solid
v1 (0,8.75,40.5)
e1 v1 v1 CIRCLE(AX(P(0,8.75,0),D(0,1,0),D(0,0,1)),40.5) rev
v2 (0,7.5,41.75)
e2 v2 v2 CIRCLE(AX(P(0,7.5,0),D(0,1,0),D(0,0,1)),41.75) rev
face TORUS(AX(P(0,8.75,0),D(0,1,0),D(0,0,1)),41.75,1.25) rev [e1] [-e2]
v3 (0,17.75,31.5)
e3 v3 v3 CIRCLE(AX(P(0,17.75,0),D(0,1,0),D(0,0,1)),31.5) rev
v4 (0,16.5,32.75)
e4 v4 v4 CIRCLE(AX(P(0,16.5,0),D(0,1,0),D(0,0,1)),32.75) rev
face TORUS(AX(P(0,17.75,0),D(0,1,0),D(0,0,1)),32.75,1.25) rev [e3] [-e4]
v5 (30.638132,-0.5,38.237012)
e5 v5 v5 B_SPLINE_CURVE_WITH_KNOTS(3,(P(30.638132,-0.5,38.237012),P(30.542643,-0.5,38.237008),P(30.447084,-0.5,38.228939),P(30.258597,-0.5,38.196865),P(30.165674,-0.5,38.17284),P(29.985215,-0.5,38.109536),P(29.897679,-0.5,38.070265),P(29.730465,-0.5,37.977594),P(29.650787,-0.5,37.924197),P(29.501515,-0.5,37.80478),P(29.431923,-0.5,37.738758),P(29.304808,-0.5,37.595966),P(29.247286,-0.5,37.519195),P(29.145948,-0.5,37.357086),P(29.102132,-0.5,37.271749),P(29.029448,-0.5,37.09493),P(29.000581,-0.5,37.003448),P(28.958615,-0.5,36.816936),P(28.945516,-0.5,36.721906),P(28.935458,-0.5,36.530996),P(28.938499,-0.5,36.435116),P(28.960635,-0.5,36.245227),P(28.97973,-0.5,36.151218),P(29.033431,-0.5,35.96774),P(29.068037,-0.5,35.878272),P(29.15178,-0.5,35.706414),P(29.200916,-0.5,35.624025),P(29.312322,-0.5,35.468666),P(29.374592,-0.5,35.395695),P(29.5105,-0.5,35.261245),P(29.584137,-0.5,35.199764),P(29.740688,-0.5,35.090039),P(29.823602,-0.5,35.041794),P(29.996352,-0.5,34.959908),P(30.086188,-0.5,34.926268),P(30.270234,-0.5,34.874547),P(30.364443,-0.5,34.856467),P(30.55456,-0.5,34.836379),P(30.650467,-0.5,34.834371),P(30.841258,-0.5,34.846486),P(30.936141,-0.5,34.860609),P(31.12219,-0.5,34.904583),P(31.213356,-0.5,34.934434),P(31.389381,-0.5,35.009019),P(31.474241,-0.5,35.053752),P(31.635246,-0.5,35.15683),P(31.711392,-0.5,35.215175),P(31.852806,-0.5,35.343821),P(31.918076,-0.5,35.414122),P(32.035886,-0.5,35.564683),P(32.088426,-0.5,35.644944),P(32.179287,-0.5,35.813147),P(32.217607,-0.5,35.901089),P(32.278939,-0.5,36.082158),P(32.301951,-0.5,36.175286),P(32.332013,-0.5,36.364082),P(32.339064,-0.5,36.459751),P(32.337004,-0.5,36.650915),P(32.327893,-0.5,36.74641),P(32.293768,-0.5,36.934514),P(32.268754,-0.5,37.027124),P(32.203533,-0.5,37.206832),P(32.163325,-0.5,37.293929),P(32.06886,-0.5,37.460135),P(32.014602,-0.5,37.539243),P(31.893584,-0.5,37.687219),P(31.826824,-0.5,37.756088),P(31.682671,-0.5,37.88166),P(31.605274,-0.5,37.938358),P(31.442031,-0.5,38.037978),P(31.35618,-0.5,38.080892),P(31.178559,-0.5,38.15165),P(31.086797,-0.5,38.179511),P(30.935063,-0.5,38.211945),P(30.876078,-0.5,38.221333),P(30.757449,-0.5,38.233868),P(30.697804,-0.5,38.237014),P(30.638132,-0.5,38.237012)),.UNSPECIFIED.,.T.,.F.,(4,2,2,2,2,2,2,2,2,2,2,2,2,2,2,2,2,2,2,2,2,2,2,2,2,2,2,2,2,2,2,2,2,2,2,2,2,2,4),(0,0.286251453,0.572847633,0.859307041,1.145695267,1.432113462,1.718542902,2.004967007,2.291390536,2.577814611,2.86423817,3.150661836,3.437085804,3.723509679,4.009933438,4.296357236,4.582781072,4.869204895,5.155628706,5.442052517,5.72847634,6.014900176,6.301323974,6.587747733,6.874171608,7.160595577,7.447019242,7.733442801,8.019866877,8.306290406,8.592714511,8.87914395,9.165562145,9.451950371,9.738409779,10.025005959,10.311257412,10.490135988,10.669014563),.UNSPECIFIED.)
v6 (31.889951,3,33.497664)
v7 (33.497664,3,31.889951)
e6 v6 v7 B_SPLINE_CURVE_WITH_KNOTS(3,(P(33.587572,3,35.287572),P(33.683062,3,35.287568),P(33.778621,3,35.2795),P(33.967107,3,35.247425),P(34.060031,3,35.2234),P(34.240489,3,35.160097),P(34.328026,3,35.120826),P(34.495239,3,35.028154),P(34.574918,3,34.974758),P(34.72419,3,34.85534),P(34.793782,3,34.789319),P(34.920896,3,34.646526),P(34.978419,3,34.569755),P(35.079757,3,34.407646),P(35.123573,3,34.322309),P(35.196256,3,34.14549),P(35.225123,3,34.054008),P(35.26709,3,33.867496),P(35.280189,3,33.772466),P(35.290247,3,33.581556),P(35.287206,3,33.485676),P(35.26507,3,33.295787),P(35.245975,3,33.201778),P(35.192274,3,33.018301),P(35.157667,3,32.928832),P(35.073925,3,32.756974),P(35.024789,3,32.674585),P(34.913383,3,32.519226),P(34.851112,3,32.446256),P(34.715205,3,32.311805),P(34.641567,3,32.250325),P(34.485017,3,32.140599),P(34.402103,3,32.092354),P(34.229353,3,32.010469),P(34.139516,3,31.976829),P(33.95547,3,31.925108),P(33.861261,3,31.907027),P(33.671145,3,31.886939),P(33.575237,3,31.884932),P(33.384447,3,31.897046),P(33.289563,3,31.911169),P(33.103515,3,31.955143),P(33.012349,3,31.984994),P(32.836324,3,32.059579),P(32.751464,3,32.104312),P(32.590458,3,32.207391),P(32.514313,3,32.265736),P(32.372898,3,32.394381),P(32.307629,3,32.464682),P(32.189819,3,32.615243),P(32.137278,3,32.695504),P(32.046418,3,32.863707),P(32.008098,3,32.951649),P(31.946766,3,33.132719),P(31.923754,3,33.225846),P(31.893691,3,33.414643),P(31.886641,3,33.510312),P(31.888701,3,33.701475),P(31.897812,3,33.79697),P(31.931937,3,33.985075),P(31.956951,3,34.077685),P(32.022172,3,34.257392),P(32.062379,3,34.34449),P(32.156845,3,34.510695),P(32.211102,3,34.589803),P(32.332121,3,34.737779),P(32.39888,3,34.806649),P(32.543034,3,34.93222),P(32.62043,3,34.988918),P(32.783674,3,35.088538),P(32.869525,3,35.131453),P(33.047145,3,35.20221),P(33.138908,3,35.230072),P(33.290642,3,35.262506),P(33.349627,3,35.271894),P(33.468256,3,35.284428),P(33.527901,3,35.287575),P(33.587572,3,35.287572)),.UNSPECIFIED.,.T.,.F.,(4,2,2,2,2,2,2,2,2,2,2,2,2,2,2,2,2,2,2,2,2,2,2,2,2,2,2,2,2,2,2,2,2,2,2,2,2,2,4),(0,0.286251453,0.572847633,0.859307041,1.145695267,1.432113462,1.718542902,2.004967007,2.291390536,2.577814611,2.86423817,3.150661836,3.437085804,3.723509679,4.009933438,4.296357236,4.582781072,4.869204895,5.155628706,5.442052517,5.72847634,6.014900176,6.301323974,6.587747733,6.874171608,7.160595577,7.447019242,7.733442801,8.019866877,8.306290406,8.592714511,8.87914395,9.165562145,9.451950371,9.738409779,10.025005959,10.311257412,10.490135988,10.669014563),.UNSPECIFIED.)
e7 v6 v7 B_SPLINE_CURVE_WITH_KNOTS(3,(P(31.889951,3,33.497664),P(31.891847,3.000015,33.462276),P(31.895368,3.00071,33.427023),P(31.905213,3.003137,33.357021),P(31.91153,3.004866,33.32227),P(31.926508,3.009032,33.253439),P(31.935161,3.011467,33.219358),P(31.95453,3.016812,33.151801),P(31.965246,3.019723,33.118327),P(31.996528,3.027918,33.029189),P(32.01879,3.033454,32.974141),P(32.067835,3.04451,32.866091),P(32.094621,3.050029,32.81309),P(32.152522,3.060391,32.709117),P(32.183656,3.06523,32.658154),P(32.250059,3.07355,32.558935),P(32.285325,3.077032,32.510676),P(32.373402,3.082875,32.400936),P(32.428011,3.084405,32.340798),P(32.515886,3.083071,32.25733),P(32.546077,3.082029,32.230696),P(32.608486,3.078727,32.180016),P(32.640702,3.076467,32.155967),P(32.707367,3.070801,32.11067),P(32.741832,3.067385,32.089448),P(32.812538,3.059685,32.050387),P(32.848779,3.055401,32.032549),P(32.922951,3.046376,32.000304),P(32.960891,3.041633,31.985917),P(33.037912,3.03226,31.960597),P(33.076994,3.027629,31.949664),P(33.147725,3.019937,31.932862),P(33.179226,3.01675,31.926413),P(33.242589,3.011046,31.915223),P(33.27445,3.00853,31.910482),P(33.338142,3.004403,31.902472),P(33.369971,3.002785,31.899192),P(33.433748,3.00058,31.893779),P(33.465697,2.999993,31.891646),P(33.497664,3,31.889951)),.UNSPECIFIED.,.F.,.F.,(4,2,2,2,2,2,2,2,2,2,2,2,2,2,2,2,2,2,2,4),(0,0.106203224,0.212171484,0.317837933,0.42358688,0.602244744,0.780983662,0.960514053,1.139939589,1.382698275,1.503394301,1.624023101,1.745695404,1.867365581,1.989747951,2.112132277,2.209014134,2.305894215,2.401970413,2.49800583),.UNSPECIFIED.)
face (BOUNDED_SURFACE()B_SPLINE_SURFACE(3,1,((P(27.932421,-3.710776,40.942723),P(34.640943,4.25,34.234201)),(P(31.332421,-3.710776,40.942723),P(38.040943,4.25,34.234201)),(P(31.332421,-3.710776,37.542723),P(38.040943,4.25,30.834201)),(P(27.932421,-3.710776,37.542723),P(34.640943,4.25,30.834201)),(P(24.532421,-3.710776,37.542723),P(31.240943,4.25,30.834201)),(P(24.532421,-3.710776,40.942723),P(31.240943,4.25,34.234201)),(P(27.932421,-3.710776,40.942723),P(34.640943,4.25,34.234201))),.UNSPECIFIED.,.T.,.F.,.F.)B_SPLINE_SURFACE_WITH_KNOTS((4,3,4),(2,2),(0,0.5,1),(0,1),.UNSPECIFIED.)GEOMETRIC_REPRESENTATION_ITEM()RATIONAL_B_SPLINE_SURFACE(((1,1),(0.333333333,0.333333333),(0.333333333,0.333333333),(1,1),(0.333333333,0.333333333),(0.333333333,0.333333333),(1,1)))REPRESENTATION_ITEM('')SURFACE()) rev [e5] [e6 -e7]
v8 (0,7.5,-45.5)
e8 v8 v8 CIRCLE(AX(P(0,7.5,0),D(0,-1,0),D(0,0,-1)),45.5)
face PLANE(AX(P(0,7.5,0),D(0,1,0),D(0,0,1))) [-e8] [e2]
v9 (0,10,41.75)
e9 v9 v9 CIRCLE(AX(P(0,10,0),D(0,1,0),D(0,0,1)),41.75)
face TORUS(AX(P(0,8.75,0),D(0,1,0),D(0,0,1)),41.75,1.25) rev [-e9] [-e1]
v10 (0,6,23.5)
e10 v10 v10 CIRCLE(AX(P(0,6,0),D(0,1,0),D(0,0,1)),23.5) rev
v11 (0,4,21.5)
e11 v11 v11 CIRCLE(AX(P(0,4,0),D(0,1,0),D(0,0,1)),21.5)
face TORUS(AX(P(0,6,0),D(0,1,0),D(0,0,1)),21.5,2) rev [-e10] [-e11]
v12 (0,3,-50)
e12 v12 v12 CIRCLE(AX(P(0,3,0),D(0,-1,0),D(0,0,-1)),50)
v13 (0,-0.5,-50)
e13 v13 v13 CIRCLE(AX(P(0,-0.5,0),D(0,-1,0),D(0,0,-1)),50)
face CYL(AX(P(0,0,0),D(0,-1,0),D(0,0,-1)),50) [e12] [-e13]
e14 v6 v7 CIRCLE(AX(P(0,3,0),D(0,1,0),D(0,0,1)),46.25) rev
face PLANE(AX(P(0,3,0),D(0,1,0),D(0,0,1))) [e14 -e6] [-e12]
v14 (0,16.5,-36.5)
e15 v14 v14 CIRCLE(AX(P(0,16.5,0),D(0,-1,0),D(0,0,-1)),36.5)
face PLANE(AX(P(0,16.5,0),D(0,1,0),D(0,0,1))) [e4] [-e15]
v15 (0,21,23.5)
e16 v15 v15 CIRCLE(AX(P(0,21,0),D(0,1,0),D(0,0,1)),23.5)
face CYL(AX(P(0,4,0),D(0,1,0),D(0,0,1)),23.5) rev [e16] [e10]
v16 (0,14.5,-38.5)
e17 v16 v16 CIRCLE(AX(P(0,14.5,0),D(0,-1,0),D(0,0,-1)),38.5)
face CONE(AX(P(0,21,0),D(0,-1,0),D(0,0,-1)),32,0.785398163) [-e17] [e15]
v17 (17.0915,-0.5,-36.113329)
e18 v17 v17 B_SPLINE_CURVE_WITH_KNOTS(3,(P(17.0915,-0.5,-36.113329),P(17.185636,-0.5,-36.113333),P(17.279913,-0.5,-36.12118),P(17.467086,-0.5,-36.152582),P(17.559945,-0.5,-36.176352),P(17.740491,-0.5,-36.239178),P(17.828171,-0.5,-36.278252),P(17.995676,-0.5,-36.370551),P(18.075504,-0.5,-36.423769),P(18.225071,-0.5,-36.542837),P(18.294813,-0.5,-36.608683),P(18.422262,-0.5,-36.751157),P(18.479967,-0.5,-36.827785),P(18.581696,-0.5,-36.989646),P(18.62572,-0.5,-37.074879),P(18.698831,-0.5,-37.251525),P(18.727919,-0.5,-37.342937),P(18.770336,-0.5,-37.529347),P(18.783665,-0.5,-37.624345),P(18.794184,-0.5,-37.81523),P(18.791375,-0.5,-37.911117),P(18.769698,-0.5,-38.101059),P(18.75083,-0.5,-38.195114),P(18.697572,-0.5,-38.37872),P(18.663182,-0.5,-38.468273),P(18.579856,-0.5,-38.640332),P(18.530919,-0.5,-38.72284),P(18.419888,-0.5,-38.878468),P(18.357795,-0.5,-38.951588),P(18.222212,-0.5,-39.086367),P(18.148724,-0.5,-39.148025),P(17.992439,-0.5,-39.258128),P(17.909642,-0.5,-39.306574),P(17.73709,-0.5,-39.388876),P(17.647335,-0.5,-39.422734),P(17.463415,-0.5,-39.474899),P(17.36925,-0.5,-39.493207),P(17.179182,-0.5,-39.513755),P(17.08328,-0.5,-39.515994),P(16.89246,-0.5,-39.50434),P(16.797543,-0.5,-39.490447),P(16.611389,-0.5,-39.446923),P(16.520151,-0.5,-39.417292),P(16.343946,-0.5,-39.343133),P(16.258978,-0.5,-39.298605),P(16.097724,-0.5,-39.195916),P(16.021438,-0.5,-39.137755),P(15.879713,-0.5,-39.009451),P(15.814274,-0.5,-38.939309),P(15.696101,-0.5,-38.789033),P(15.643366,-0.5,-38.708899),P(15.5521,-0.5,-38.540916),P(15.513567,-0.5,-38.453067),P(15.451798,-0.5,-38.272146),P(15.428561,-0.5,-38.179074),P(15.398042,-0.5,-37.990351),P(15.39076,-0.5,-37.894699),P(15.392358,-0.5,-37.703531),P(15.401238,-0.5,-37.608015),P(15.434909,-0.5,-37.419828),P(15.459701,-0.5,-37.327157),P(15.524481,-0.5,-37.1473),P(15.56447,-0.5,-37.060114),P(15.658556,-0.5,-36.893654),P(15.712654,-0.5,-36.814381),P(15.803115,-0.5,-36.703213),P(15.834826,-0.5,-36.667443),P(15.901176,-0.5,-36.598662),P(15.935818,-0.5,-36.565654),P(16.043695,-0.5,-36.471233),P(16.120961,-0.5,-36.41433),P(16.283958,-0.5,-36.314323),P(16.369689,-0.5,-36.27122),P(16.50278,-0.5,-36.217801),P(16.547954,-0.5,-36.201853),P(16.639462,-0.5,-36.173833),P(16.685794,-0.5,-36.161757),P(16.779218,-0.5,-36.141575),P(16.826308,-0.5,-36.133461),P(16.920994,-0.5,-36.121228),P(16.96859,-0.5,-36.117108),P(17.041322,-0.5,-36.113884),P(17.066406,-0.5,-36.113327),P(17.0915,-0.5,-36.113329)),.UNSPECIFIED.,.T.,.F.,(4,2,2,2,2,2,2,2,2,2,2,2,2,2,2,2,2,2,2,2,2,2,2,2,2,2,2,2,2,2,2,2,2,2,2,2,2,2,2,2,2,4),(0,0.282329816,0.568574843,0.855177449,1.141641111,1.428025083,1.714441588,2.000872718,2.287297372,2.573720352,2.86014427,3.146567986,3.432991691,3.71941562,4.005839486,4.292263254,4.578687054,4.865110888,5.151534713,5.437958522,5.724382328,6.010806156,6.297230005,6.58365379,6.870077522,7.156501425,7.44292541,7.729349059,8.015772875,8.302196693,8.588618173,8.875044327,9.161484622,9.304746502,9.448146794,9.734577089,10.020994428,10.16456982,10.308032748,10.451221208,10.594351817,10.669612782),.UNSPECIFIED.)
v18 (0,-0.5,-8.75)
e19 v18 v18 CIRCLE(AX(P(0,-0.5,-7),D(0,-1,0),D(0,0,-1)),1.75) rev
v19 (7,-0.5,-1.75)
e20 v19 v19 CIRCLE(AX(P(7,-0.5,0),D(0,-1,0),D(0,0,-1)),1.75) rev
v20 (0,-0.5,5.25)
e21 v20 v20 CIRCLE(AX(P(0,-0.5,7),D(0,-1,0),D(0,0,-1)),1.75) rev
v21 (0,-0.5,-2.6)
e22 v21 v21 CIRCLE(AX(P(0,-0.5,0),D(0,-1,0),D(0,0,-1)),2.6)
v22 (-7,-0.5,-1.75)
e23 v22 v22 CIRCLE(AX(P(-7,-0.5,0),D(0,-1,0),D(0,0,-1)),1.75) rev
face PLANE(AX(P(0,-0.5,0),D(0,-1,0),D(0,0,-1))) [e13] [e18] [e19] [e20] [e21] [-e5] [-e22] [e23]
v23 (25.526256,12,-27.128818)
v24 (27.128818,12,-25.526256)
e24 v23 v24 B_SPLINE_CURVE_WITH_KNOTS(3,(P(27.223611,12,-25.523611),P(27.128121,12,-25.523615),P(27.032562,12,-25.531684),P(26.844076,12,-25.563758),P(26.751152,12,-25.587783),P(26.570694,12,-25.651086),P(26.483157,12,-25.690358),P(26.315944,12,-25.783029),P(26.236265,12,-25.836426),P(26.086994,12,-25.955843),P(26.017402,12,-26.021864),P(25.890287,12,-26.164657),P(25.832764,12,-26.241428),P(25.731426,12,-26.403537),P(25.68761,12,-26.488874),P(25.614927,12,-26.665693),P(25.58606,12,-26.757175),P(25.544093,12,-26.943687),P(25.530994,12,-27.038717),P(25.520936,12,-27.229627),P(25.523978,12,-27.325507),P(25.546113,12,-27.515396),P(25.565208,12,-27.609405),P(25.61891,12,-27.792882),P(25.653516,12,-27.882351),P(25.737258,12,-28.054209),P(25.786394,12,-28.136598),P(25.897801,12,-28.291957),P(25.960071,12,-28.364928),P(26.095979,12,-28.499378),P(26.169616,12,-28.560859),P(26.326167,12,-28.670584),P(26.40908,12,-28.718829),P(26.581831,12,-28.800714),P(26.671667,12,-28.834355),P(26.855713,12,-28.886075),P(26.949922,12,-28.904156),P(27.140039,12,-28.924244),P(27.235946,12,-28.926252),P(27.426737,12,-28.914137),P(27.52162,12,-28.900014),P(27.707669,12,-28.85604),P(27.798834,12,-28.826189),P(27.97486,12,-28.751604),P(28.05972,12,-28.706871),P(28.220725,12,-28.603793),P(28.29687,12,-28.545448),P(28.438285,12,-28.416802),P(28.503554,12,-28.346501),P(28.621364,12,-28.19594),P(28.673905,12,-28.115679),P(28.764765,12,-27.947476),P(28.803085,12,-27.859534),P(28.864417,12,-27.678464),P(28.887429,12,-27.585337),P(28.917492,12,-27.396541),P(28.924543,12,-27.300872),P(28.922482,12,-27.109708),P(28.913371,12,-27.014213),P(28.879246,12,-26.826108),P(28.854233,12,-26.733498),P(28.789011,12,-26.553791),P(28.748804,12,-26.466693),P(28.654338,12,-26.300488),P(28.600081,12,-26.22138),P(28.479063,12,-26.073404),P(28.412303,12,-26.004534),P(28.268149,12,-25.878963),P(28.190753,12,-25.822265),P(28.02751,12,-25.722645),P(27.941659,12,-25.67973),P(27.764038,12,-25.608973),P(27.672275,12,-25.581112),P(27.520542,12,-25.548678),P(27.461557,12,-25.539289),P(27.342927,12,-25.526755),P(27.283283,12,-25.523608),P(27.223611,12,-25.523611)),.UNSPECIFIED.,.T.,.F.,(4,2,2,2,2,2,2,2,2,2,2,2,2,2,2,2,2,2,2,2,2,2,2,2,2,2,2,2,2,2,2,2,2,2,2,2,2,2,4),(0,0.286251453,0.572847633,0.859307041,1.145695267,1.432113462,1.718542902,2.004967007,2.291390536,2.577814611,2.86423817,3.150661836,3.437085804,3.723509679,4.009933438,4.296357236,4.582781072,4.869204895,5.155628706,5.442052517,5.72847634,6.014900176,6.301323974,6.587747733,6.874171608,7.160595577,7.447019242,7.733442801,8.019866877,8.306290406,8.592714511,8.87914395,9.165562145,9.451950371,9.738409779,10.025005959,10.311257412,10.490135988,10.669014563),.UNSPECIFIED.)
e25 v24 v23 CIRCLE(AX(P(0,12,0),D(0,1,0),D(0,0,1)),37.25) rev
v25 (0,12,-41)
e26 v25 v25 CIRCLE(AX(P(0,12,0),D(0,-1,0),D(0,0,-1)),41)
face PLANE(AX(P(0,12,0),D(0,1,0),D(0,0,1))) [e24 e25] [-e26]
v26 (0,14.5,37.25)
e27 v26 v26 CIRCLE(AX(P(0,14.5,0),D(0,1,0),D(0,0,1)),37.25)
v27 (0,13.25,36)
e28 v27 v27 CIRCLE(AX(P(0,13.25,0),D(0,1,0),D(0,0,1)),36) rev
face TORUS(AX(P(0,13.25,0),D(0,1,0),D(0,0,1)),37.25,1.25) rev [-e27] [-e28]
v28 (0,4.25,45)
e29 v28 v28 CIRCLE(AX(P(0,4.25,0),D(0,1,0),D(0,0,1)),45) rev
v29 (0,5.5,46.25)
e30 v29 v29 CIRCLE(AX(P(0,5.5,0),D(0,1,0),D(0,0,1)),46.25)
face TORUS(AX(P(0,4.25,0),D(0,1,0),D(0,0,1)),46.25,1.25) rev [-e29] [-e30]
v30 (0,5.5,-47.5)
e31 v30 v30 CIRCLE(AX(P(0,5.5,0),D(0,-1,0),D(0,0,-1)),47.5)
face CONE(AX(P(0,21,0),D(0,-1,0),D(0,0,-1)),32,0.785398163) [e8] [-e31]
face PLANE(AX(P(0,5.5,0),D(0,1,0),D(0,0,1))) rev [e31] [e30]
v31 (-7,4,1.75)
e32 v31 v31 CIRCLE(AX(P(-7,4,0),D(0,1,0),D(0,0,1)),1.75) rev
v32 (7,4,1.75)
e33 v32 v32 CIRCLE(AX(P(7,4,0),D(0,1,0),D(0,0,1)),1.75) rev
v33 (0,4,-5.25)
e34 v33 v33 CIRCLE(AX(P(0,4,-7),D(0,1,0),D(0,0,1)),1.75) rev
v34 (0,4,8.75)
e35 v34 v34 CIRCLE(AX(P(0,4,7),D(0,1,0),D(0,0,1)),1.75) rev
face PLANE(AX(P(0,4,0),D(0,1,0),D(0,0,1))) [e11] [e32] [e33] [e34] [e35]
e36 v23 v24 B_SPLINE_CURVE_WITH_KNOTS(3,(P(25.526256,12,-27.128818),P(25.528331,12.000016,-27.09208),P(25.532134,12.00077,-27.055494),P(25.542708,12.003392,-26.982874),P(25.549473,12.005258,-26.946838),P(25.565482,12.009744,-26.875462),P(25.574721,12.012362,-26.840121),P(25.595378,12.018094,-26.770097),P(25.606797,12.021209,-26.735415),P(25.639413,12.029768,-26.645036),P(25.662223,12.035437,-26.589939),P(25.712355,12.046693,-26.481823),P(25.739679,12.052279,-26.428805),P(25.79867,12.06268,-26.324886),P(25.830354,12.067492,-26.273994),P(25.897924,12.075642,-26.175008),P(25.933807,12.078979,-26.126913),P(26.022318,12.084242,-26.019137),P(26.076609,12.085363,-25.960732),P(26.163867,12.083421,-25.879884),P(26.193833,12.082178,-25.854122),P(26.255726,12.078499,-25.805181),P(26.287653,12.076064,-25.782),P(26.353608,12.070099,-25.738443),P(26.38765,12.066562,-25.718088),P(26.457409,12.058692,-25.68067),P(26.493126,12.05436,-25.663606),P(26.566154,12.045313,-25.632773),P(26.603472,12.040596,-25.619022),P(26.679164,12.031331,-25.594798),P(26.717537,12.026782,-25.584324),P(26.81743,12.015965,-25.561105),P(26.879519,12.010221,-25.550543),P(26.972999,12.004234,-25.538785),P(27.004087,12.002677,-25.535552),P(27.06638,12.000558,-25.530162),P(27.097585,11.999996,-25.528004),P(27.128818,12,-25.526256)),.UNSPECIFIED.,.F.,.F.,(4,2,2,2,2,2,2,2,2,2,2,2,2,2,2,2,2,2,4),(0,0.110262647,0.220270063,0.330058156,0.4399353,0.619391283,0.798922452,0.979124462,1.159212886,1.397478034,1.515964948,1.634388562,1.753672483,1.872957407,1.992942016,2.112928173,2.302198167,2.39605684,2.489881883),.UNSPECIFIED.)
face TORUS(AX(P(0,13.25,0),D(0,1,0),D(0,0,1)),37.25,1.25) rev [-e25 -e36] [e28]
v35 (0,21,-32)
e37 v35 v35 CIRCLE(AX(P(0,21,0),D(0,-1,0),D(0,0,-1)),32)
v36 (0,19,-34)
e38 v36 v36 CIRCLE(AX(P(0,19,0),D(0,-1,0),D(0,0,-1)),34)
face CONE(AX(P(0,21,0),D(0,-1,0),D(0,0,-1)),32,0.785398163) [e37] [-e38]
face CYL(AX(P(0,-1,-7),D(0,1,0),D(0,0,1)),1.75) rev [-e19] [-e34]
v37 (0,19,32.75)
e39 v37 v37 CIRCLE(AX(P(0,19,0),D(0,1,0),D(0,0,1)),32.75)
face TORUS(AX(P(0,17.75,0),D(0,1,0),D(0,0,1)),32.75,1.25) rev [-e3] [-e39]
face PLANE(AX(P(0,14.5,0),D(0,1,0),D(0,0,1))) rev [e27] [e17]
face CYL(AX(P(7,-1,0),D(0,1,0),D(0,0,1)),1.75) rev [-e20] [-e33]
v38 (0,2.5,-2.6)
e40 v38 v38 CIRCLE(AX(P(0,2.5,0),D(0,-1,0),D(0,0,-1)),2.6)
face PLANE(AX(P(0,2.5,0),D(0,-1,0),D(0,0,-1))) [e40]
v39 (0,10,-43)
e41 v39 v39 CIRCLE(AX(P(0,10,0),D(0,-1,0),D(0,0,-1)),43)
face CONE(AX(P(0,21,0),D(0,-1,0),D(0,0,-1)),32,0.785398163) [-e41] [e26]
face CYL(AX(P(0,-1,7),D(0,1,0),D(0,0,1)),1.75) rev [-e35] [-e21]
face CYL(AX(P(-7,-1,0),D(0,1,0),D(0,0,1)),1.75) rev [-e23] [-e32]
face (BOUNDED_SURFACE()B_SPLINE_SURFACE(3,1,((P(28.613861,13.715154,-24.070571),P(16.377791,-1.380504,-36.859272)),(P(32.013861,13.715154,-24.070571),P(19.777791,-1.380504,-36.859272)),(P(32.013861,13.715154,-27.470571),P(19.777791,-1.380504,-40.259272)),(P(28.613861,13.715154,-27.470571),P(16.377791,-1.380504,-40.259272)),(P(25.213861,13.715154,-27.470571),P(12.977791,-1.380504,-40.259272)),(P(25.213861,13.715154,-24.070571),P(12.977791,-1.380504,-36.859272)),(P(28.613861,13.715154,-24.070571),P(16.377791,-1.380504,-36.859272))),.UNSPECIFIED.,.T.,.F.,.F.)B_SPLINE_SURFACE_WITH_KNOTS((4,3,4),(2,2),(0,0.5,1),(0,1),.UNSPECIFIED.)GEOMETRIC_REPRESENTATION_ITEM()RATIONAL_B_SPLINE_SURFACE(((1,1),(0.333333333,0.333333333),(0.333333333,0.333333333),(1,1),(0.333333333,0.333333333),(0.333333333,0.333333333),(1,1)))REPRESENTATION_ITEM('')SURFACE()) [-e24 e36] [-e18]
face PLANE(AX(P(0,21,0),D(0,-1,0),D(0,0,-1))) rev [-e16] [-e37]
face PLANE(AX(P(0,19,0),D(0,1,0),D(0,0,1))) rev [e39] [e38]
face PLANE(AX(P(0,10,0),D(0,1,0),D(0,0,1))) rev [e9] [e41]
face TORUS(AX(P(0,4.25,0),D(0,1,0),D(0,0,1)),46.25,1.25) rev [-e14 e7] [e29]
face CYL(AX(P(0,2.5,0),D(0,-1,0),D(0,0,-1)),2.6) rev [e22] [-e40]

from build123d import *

# Parameters (mm, degrees)
FILLET1_R               = 1.25
SKETCH11_R              = 23.5
CUT_EXTRUDE2_DEPTH      = 17
FILLET2_R               = 2
BOSS_EXTRUDE1_START     = 0.5
SKETCH19_R              = 50
BOSS_EXTRUDE1_DEPTH     = 0.5
CUT_EXTRUDE1_DEPTH      = 0.5
CUT_EXTRUDE1_DEPTH_BACK = 74.907036201
SKETCH9_R               = 1.75
SKETCH20_R              = 2.6
CUT_EXTRUDE3_DEPTH      = 3
SKETCH8_R               = 1.7
SKETCH7_R               = 1.7


with BuildPart() as part:
    # Sketch1 → Revolve1 (revolve)
    with BuildSketch(Plane.XY, mode=Mode.PRIVATE) as revolve1_sk:
        Polygon((0, 0), (0, 21), (-32, 21), (-50, 3), (-50, 0), align=None)
    revolve(revolve1_sk.sketch.rotate(Axis((0, 0, 0), (0, 1, 0)), 270), axis=Axis((0, 0, 0), (0, 1, 0)))

    # Sketch2 → Cut-Revolve1 (revolve, cut)
    with BuildSketch(Plane.XY, mode=Mode.PRIVATE) as cut_revolve1_sk:
        Polygon((-45, 5.5), (-47.5, 5.5), (-50, 3), (-45, 3), align=None)
        Polygon((-31.5, 19), (-34, 19), (-36.5, 16.5), (-31.5, 16.5), align=None)
        Polygon((-40.5, 10), (-43, 10), (-45.5, 7.5), (-40.5, 7.5), align=None)
        Polygon((-36, 14.5), (-38.5, 14.5), (-41, 12), (-36, 12), align=None)
    revolve(cut_revolve1_sk.sketch.rotate(Axis((0, 0, 0), (0, 1, 0)), 270), axis=Axis((0, 0, 0), (0, 1, 0)), mode=Mode.SUBTRACT)

    # Fillet1
    fillet1_edges = [part.edges().sort_by_distance(p)[0] for p in [
        (0, 5.5, 45),
        (0, 3, 45),
        (0, 12, 36),
        (0, 14.5, 36),
        (0, 7.5, 40.5),
        (0, 10, 40.5),
        (0, 19, 31.5),
        (0, 16.5, 31.5),
    ]]
    fillet(fillet1_edges, radius=FILLET1_R - 0.0001)  # a hair under: the kernel refuses the full size

    # Sketch11 → Cut-Extrude2 (cut)
    with BuildSketch(Plane(origin=(0, 21, 0), x_dir=(1, 0, 0), z_dir=(0, 1, 0))):
        with Locations(Location((0, 0, 0), (0, 0, 270))):
            Circle(SKETCH11_R)
    extrude(amount=-CUT_EXTRUDE2_DEPTH, mode=Mode.SUBTRACT)

    # Fillet2
    fillet2_edges = [part.edges().sort_by_distance(p)[0] for p in [
        (0, 4, -23.5),
    ]]
    fillet(fillet2_edges, radius=FILLET2_R)

    # Sketch19 → Boss-Extrude1 (add)
    with BuildSketch(Plane.XZ.offset(BOSS_EXTRUDE1_START)):
        with Locations(Location((0, 0, 0), (0, 0, 270))):
            Circle(SKETCH19_R)
    extrude(amount=-BOSS_EXTRUDE1_DEPTH)

    # Sketch9 → Cut-Extrude1 (cut, two sides: drawn at the far end of the back side and taken through both)
    with BuildSketch(Plane.XZ.offset(0.5).offset(-CUT_EXTRUDE1_DEPTH_BACK)):
        with Locations(Location((-7, 0, 0), (0, 0, 90))):
            Circle(SKETCH9_R)
        with BuildLine():
            ThreePointArc((0, 8.75), (-1.75, 7), (0, 5.25))
            Line((0, 5.25), (0, 8.75))
        make_face()
        with BuildLine():
            Line((0, 8.75), (0, 5.25))
            ThreePointArc((0, 5.25), (1.237436867, 5.762563133), (1.75, 7))
            ThreePointArc((1.75, 7), (1.237436867, 8.237436867), (0, 8.75))
        make_face()
        with Locations(Location((7, 0, 0), (0, 0, 90))):
            Circle(SKETCH9_R)
        with Locations(Location((0, -7, 0), (0, 0, 90))):
            Circle(SKETCH9_R)
    extrude(amount=CUT_EXTRUDE1_DEPTH + CUT_EXTRUDE1_DEPTH_BACK, mode=Mode.SUBTRACT)

    # Sketch20 → Cut-Extrude3 (cut)
    with BuildSketch(Plane.XZ.offset(0.5)):
        with Locations(Location((0, 0, 0), (0, 0, 270))):
            Circle(SKETCH20_R)
    extrude(amount=-CUT_EXTRUDE3_DEPTH, mode=Mode.SUBTRACT)

    # Cut-Sweep1: sweep along a path in Sketch25
    with BuildLine(Plane(origin=(33.587572106, 0, 33.587572106), x_dir=(0.7071067811865476, 0, -0.7071067811865476), z_dir=(0.7071067811865476, 0, 0.7071067811865476))) as cut_sweep1_path:
        Line((1.489691991, 4.25), (-7.99759116, -3.710775793))
    # Sketch8 → Cut-Sweep1 (sweep, cut)
    with BuildSketch(Plane(origin=(0, 3, 0), x_dir=(1, 0, 0), z_dir=(0, 1, 0))):
        with Locations((33.587572106, -33.587572106)):
            Circle(SKETCH8_R)
    sweep(path=cut_sweep1_path.line, mode=Mode.SUBTRACT)

    # Cut-Sweep2: sweep along a path in Sketch24
    with BuildLine(Plane(origin=(27.811235607, 0, -26.609447082), x_dir=(0.6913229775943835, 0, 0.7225458744260018), z_dir=(-0.7225458744260018, 0, 0.6913229775943835))) as cut_sweep2_path:
        Line((-16.538499804, -1.380504084), (1.160999844, 13.7151539))
    # Sketch7 → Cut-Sweep2 (sweep, cut)
    with BuildSketch(Plane(origin=(0, 12, 0), x_dir=(1, 0, 0), z_dir=(0, 1, 0))):
        with Locations((27.223611076, 27.223611076)):
            Circle(SKETCH7_R)
    sweep(path=cut_sweep2_path.line, mode=Mode.SUBTRACT)


solid = part.part
